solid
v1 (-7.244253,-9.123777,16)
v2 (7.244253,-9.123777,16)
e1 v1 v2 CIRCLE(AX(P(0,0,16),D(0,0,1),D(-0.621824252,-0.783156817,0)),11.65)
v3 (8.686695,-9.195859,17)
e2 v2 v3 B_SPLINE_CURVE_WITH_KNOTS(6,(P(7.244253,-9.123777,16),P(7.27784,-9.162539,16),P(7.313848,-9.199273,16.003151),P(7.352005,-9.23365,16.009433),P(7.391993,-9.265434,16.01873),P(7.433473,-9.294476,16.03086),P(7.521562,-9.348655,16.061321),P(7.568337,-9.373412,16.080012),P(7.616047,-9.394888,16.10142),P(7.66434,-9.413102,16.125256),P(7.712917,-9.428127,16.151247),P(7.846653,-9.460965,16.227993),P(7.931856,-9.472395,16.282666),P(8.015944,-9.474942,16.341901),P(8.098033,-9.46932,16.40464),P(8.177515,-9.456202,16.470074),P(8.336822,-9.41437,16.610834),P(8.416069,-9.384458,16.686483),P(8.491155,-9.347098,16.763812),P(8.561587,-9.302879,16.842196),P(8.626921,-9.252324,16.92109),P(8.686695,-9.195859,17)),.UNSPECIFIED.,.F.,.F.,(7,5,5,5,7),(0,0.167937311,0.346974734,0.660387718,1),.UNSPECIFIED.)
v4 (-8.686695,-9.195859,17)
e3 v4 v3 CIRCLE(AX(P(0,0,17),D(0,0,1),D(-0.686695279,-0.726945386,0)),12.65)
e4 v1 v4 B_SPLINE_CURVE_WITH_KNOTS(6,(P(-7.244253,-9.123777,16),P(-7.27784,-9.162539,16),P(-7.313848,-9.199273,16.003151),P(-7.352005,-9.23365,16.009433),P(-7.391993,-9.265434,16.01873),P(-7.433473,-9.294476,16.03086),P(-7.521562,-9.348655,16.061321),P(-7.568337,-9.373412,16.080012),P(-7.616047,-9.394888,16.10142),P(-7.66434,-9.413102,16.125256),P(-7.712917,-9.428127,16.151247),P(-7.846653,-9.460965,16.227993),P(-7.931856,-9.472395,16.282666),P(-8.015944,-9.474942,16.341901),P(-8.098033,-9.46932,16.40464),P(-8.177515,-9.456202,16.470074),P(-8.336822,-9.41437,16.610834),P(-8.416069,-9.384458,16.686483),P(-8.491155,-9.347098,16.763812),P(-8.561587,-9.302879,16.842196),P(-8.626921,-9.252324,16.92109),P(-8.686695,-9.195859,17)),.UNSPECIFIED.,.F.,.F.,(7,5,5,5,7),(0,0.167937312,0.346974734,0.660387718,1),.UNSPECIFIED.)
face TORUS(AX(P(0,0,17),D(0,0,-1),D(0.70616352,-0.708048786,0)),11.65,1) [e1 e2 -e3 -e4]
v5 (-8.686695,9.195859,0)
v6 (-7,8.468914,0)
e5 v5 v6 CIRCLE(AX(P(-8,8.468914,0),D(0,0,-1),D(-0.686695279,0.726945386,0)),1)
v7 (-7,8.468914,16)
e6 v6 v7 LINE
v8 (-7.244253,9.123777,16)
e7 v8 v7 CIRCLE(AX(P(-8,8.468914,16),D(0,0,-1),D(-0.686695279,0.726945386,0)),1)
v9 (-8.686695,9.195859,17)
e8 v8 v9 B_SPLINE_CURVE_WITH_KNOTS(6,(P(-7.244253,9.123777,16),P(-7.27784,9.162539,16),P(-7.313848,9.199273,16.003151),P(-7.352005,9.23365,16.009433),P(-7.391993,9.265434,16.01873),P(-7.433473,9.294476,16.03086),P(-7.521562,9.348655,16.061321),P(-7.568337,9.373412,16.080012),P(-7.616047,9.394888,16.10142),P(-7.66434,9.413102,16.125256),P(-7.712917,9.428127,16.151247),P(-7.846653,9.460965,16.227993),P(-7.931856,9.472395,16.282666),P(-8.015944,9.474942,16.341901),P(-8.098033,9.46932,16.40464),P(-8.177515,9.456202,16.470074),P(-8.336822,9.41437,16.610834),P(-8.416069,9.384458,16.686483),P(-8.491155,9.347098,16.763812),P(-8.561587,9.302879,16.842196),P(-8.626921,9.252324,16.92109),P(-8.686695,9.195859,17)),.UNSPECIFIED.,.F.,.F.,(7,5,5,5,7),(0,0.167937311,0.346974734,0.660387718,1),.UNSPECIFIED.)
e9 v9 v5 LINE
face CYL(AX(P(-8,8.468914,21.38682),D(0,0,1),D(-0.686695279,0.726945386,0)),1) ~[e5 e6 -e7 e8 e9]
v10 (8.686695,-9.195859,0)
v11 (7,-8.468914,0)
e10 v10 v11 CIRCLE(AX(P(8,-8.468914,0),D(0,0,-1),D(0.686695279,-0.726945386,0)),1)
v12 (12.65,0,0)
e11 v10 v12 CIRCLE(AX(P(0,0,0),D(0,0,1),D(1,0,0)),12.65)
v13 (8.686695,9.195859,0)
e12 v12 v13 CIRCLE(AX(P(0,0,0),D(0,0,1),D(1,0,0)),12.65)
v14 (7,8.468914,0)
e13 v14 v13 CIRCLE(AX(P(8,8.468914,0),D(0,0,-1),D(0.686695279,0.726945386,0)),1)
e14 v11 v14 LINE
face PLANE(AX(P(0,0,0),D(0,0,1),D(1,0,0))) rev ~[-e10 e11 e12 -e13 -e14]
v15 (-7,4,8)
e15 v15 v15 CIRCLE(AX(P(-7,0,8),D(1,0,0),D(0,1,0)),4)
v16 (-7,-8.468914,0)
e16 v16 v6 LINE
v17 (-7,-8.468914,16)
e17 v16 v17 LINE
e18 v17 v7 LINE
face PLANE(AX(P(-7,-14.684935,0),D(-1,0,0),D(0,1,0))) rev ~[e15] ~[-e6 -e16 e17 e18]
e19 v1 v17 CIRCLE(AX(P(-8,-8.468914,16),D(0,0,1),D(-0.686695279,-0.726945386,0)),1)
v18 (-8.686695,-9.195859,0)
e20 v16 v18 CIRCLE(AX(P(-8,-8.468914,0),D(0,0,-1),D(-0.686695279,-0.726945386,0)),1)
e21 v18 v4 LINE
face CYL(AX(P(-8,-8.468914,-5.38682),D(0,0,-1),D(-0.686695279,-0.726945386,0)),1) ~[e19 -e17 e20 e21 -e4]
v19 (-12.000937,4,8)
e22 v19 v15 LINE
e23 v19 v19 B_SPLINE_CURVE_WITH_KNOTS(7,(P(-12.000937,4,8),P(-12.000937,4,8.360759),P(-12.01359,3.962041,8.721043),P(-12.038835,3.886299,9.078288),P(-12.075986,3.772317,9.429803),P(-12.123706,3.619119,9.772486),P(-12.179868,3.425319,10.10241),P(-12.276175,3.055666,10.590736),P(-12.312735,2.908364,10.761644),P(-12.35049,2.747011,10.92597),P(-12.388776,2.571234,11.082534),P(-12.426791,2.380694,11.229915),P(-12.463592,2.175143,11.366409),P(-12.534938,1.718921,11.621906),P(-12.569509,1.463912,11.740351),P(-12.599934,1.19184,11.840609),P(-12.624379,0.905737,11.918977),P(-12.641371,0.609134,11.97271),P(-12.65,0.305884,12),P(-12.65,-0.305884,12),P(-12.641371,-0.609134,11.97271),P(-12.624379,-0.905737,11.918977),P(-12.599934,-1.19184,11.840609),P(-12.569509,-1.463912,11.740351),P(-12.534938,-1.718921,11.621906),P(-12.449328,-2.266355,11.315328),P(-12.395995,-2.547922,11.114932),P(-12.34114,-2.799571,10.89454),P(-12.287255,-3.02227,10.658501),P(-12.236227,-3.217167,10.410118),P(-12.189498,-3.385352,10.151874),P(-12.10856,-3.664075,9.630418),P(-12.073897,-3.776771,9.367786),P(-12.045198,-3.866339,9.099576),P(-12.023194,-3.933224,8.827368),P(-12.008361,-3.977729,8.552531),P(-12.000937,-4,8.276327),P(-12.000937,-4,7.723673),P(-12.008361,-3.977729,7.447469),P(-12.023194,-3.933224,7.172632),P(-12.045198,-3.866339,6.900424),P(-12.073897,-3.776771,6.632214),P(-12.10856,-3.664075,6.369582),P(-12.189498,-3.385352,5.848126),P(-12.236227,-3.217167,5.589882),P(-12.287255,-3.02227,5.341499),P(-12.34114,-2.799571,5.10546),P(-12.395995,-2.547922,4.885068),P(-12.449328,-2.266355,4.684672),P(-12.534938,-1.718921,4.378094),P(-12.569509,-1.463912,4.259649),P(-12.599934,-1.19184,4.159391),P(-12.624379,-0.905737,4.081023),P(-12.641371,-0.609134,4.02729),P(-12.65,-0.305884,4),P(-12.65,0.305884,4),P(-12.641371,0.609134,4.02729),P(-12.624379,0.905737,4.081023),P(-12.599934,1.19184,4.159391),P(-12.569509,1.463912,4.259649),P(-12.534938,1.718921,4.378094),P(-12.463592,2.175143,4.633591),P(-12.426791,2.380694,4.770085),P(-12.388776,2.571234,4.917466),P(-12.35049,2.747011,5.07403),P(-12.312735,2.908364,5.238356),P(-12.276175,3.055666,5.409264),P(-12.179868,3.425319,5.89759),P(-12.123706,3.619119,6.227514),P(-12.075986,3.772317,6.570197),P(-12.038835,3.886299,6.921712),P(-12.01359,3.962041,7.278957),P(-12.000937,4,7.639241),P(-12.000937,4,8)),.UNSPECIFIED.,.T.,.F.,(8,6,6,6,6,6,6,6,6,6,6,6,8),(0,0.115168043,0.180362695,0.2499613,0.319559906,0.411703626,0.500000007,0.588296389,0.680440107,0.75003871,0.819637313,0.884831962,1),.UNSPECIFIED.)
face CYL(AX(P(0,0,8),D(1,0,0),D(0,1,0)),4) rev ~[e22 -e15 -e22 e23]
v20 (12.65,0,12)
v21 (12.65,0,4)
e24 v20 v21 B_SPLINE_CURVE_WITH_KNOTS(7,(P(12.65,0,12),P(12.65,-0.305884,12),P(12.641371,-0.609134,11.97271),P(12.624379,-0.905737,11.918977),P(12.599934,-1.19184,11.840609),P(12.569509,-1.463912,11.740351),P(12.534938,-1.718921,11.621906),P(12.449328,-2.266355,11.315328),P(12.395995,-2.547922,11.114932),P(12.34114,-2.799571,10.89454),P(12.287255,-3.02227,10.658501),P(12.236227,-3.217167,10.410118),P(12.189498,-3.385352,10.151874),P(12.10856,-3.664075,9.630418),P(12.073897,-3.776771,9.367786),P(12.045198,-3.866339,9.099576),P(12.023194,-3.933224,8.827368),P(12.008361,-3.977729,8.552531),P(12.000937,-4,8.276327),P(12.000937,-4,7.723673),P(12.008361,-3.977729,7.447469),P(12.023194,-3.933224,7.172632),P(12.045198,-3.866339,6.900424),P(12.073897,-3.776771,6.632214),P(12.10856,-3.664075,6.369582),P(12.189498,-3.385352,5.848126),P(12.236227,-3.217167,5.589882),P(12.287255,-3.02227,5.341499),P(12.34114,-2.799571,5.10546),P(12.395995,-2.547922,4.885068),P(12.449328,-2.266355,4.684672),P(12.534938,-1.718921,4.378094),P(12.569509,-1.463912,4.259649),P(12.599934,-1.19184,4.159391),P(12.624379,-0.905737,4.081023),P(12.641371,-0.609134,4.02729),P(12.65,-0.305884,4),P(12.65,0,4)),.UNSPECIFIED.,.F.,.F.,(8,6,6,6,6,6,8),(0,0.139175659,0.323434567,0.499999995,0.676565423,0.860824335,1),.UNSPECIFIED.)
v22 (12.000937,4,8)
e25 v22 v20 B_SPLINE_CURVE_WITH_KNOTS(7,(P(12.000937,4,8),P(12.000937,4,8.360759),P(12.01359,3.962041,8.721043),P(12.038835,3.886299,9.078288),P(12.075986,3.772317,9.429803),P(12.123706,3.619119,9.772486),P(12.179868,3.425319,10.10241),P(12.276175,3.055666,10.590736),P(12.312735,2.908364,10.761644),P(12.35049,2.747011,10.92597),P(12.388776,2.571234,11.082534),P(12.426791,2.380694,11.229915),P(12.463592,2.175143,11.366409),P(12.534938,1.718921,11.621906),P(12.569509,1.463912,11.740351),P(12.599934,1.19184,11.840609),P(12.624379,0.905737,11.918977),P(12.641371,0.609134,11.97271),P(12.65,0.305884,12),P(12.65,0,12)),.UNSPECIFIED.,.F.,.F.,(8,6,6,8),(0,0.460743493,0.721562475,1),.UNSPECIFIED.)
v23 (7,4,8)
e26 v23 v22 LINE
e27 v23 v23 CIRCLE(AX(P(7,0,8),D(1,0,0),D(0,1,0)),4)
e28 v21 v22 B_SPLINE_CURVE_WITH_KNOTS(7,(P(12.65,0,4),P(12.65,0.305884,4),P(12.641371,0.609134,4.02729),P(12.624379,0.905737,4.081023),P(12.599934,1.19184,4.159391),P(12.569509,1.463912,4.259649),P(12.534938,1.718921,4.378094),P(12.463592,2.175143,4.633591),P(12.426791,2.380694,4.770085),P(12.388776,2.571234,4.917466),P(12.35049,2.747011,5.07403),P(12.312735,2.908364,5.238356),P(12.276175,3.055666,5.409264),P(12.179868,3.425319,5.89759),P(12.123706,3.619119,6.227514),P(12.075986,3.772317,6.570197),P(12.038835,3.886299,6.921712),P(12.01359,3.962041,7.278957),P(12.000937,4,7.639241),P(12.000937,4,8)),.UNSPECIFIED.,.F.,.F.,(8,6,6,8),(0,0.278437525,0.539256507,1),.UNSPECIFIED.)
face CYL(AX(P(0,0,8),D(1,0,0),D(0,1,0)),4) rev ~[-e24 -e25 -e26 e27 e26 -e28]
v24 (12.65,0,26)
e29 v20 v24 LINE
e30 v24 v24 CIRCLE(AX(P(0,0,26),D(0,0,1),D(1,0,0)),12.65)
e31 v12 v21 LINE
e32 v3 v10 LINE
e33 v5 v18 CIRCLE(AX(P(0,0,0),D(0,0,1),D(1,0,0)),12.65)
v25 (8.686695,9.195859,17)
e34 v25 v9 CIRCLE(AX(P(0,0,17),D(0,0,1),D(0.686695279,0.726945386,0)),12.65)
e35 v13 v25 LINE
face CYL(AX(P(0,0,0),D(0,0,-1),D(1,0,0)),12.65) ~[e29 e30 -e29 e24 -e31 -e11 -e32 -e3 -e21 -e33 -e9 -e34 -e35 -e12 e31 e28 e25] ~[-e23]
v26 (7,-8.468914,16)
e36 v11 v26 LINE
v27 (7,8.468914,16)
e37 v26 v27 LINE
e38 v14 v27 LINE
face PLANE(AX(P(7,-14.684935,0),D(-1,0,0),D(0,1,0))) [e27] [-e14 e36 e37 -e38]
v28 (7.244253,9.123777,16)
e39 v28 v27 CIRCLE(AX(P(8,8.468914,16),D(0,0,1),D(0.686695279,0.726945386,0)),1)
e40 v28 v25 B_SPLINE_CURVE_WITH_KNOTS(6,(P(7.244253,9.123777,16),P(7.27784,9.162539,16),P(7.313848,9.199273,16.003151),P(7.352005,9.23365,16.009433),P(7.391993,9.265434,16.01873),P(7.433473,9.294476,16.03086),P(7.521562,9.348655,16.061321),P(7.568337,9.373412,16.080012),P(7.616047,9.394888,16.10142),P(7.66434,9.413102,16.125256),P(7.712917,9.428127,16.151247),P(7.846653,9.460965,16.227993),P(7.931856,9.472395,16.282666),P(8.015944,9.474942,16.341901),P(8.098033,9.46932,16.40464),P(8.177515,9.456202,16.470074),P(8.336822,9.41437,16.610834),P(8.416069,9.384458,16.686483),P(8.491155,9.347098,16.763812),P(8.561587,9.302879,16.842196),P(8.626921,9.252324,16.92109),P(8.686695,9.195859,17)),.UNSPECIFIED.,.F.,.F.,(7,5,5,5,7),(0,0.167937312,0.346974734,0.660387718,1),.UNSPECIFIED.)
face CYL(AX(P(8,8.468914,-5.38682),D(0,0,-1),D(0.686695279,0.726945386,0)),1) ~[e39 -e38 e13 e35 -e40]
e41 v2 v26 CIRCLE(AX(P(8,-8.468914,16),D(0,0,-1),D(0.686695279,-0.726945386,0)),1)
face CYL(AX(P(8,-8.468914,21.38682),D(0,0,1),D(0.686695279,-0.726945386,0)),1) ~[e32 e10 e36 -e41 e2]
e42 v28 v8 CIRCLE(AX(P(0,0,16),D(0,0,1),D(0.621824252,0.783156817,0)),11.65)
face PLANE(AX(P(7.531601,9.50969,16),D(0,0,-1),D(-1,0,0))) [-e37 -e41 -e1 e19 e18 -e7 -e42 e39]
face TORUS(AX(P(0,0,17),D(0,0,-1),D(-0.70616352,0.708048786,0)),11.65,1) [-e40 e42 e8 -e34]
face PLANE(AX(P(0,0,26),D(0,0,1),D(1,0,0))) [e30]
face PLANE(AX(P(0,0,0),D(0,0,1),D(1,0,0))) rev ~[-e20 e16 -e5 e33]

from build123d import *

# Parameters (mm, degrees)
F0_R         = 12.65
F1_DEPTH     = 26
F2_W         = 14
F2_H         = 29.3698692877
F3_DEPTH     = 16
F4_T1_DEPTH  = 21.3868200642
F4_T6_ANGLE  = 89.8472397972
F4_T12_ANGLE = 89.8472397972
F4_T19_DEPTH = 26.7736401284
F4_T23_ANGLE = 89.8472397972
F4_T30_ANGLE = 89.8472397972
F4_T34_DEPTH = 26.7736401284
F4_T41_ANGLE = 89.8472397972
F4_T45_DEPTH = 26.7736401284
F4_T52_DEPTH = 26.7736401284
F4_T56_ANGLE = 89.8472397972
F5_R         = 4
F6_DEPTH     = 16.2


# Not quite as in the source:
# - a fillet or chamfer that OpenCascade refuses, or shapes differently, is made with other operations: its cross-section is extruded or revolved along the edge and cut away or added


with BuildPart() as f1:
    # F0 (on Top) → F1 (new body)
    with BuildSketch(Plane.XY):
        Circle(F0_R)
    extrude(amount=F1_DEPTH)

    # F2 (on Top) → F3 (cut)
    with BuildSketch(Plane.XY):
        Rectangle(F2_W, F2_H)
    extrude(amount=F3_DEPTH, mode=Mode.SUBTRACT)

    # F4: fillet of radius 1 on 6 edges, made by hand

    # F4_s2 → F4_t1 (cut)
    with BuildSketch(Plane.XY.offset(-5.3868200642)):
        with BuildLine():
            ThreePointArc((8.686695279, 9.1958591295), (7.6042066694, 9.3872533539), (7, 8.4689137438))
            Line((7, 8.4689137438), (7, 10.5367215015))
            ThreePointArc((7, 10.5367215015), (7.8719489435, 9.9022684185), (8.686695279, 9.1958591295))
        make_face()
        with BuildLine():
            ThreePointArc((8.686695279, -9.1958591295), (7.6042066694, -9.3872533539), (7, -8.4689137438))
            Line((7, -8.4689137438), (7, -10.5367215015))
            ThreePointArc((7, -10.5367215015), (7.8719489435, -9.9022684185), (8.686695279, -9.1958591295))
        make_face()
        with BuildLine():
            ThreePointArc((-8.686695279, 9.1958591295), (-7.6042066694, 9.3872533539), (-7, 8.4689137438))
            Line((-7, 8.4689137438), (-7, 10.5367215015))
            ThreePointArc((-7, 10.5367215015), (-7.8719489435, 9.9022684185), (-8.686695279, 9.1958591295))
        make_face()
        with BuildLine():
            ThreePointArc((-8.686695279, -9.1958591295), (-7.6042066694, -9.3872533539), (-7, -8.4689137438))
            Line((-7, -8.4689137438), (-7, -10.5367215015))
            ThreePointArc((-7, -10.5367215015), (-7.8719489435, -9.9022684185), (-8.686695279, -9.1958591295))
        make_face()
    extrude(amount=F4_T1_DEPTH, mode=Mode.SUBTRACT)


with BuildPart() as f4_tool4:
    # F4_s5 → F4_t6 (revolve)
    with BuildSketch(Plane(origin=(0, 0, 0), x_dir=(0, 0, 1), z_dir=(-0.7080487855, -0.7061635202, 0))):
        with BuildLine():
            ThreePointArc((17, 12.65), (16.2928932188, 12.3571067812), (16, 11.65))
            Line((16, 11.65), (16, 12.65))
            Line((16, 12.65), (17, 12.65))
        make_face()
    revolve(axis=Axis((0, 0, 16), (0, 0, -1)), revolution_arc=F4_T6_ANGLE)

    split(bisect_by=Plane.YZ.offset(7), keep=Keep.BOTTOM)

    split(bisect_by=Plane.YZ.offset(-7), keep=Keep.TOP)


with BuildPart() as f1_1:
    add(f1.part)

    # F4_t3: cut F4_tool4
    add(f4_tool4.part, mode=Mode.SUBTRACT)


with BuildPart() as f4_tool10:
    # F4_s11 → F4_t12 (revolve)
    with BuildSketch(Plane(origin=(0, 0, 0), x_dir=(0, 0, 1), z_dir=(0.7080487855, 0.7061635202, 0))):
        with BuildLine():
            ThreePointArc((17, 12.65), (16.2928932188, 12.3571067812), (16, 11.65))
            Line((16, 11.65), (16, 12.65))
            Line((16, 12.65), (17, 12.65))
        make_face()
    revolve(axis=Axis((0, 0, 16), (0, 0, -1)), revolution_arc=F4_T12_ANGLE)

    split(bisect_by=Plane.YZ.offset(7), keep=Keep.BOTTOM)

    split(bisect_by=Plane.YZ.offset(-7), keep=Keep.TOP)


with BuildPart() as f1_2:
    add(f1_1.part)

    # F4_t9: cut F4_tool10
    add(f4_tool10.part, mode=Mode.SUBTRACT)


with BuildPart() as f4_tool17:
    # F4_s18 → F4_t19 (new body)
    with BuildSketch(Plane.XY.offset(21.3868200642)):
        with BuildLine():
            ThreePointArc((8.686695279, 9.1958591295), (7.6042066694, 9.3872533539), (7, 8.4689137438))
            Line((7, 8.4689137438), (7, 10.5367215015))
            ThreePointArc((7, 10.5367215015), (7.8719489435, 9.9022684185), (8.686695279, 9.1958591295))
        make_face()
    extrude(amount=-F4_T19_DEPTH)

    split(bisect_by=Plane.XY.offset(16), keep=Keep.TOP)


with BuildPart() as f4_tool21:
    # F4_s22 → F4_t23 (revolve)
    with BuildSketch(Plane(origin=(0, 0, 0), x_dir=(0, 0, 1), z_dir=(-0.7080487855, -0.7061635202, 0))):
        with BuildLine():
            ThreePointArc((17, 12.65), (16.2928932188, 12.3571067812), (16, 11.65))
            Line((16, 11.65), (16, 12.65))
            Line((16, 12.65), (17, 12.65))
        make_face()
    revolve(axis=Axis((0, 0, 16), (0, 0, -1)), revolution_arc=F4_T23_ANGLE)

    split(bisect_by=Plane.YZ.offset(7), keep=Keep.TOP)


with BuildPart() as f4_tool17_1:
    add(f4_tool17.part)

    # F4_t25: intersect F4_tool21
    add(f4_tool21.part, mode=Mode.INTERSECT)


with BuildPart() as f1_3:
    add(f1_2.part)

    # F4_t15: cut F4_tool17
    add(f4_tool17_1.part, mode=Mode.SUBTRACT)


with BuildPart() as f4_tool28:
    # F4_s29 → F4_t30 (revolve)
    with BuildSketch(Plane(origin=(0, 0, 0), x_dir=(0, 0, 1), z_dir=(0.7080487855, 0.7061635202, 0))):
        with BuildLine():
            ThreePointArc((17, 12.65), (16.2928932188, 12.3571067812), (16, 11.65))
            Line((16, 11.65), (16, 12.65))
            Line((16, 12.65), (17, 12.65))
        make_face()
    revolve(axis=Axis((0, 0, 16), (0, 0, -1)), revolution_arc=F4_T30_ANGLE)

    split(bisect_by=Plane.YZ.offset(7), keep=Keep.TOP)


with BuildPart() as f4_tool32:
    # F4_s33 → F4_t34 (new body)
    with BuildSketch(Plane.XY.offset(21.3868200642)):
        with BuildLine():
            ThreePointArc((8.686695279, -9.1958591295), (7.6042066694, -9.3872533539), (7, -8.4689137438))
            Line((7, -8.4689137438), (7, -10.5367215015))
            ThreePointArc((7, -10.5367215015), (7.8719489435, -9.9022684185), (8.686695279, -9.1958591295))
        make_face()
    extrude(amount=-F4_T34_DEPTH)

    split(bisect_by=Plane.XY.offset(16), keep=Keep.TOP)


with BuildPart() as f4_tool28_1:
    add(f4_tool28.part)

    # F4_t36: intersect F4_tool32
    add(f4_tool32.part, mode=Mode.INTERSECT)


with BuildPart() as f1_4:
    add(f1_3.part)

    # F4_t26: cut F4_tool28
    add(f4_tool28_1.part, mode=Mode.SUBTRACT)


with BuildPart() as f4_tool39:
    # F4_s40 → F4_t41 (revolve)
    with BuildSketch(Plane(origin=(0, 0, 0), x_dir=(0, 0, 1), z_dir=(-0.7080487855, -0.7061635202, 0))):
        with BuildLine():
            ThreePointArc((17, 12.65), (16.2928932188, 12.3571067812), (16, 11.65))
            Line((16, 11.65), (16, 12.65))
            Line((16, 12.65), (17, 12.65))
        make_face()
    revolve(axis=Axis((0, 0, 16), (0, 0, -1)), revolution_arc=F4_T41_ANGLE)

    split(bisect_by=Plane.YZ.offset(-7), keep=Keep.BOTTOM)


with BuildPart() as f4_tool43:
    # F4_s44 → F4_t45 (new body)
    with BuildSketch(Plane.XY.offset(21.3868200642)):
        with BuildLine():
            ThreePointArc((-8.686695279, 9.1958591295), (-7.6042066694, 9.3872533539), (-7, 8.4689137438))
            Line((-7, 8.4689137438), (-7, 10.5367215015))
            ThreePointArc((-7, 10.5367215015), (-7.8719489435, 9.9022684185), (-8.686695279, 9.1958591295))
        make_face()
    extrude(amount=-F4_T45_DEPTH)

    split(bisect_by=Plane.XY.offset(16), keep=Keep.TOP)


with BuildPart() as f4_tool39_1:
    add(f4_tool39.part)

    # F4_t47: intersect F4_tool43
    add(f4_tool43.part, mode=Mode.INTERSECT)


with BuildPart() as f1_5:
    add(f1_4.part)

    # F4_t37: cut F4_tool39
    add(f4_tool39_1.part, mode=Mode.SUBTRACT)


with BuildPart() as f4_tool50:
    # F4_s51 → F4_t52 (new body)
    with BuildSketch(Plane.XY.offset(21.3868200642)):
        with BuildLine():
            ThreePointArc((-8.686695279, -9.1958591295), (-7.6042066694, -9.3872533539), (-7, -8.4689137438))
            Line((-7, -8.4689137438), (-7, -10.5367215015))
            ThreePointArc((-7, -10.5367215015), (-7.8719489435, -9.9022684185), (-8.686695279, -9.1958591295))
        make_face()
    extrude(amount=-F4_T52_DEPTH)

    split(bisect_by=Plane.XY.offset(16), keep=Keep.TOP)


with BuildPart() as f4_tool54:
    # F4_s55 → F4_t56 (revolve)
    with BuildSketch(Plane(origin=(0, 0, 0), x_dir=(0, 0, 1), z_dir=(0.7080487855, 0.7061635202, 0))):
        with BuildLine():
            ThreePointArc((17, 12.65), (16.2928932188, 12.3571067812), (16, 11.65))
            Line((16, 11.65), (16, 12.65))
            Line((16, 12.65), (17, 12.65))
        make_face()
    revolve(axis=Axis((0, 0, 16), (0, 0, -1)), revolution_arc=F4_T56_ANGLE)

    split(bisect_by=Plane.YZ.offset(-7), keep=Keep.BOTTOM)


with BuildPart() as f4_tool50_1:
    add(f4_tool50.part)

    # F4_t58: intersect F4_tool54
    add(f4_tool54.part, mode=Mode.INTERSECT)


with BuildPart() as f1_6:
    add(f1_5.part)

    # F4_t48: cut F4_tool50
    add(f4_tool50_1.part, mode=Mode.SUBTRACT)

    # F5 (on Right) → F6 (cut, symmetric)
    with BuildSketch(Plane.YZ):
        with Locations((0, 8)):
            Circle(F5_R)
    extrude(amount=F6_DEPTH, both=True, mode=Mode.SUBTRACT)


solid = f1_6.part
